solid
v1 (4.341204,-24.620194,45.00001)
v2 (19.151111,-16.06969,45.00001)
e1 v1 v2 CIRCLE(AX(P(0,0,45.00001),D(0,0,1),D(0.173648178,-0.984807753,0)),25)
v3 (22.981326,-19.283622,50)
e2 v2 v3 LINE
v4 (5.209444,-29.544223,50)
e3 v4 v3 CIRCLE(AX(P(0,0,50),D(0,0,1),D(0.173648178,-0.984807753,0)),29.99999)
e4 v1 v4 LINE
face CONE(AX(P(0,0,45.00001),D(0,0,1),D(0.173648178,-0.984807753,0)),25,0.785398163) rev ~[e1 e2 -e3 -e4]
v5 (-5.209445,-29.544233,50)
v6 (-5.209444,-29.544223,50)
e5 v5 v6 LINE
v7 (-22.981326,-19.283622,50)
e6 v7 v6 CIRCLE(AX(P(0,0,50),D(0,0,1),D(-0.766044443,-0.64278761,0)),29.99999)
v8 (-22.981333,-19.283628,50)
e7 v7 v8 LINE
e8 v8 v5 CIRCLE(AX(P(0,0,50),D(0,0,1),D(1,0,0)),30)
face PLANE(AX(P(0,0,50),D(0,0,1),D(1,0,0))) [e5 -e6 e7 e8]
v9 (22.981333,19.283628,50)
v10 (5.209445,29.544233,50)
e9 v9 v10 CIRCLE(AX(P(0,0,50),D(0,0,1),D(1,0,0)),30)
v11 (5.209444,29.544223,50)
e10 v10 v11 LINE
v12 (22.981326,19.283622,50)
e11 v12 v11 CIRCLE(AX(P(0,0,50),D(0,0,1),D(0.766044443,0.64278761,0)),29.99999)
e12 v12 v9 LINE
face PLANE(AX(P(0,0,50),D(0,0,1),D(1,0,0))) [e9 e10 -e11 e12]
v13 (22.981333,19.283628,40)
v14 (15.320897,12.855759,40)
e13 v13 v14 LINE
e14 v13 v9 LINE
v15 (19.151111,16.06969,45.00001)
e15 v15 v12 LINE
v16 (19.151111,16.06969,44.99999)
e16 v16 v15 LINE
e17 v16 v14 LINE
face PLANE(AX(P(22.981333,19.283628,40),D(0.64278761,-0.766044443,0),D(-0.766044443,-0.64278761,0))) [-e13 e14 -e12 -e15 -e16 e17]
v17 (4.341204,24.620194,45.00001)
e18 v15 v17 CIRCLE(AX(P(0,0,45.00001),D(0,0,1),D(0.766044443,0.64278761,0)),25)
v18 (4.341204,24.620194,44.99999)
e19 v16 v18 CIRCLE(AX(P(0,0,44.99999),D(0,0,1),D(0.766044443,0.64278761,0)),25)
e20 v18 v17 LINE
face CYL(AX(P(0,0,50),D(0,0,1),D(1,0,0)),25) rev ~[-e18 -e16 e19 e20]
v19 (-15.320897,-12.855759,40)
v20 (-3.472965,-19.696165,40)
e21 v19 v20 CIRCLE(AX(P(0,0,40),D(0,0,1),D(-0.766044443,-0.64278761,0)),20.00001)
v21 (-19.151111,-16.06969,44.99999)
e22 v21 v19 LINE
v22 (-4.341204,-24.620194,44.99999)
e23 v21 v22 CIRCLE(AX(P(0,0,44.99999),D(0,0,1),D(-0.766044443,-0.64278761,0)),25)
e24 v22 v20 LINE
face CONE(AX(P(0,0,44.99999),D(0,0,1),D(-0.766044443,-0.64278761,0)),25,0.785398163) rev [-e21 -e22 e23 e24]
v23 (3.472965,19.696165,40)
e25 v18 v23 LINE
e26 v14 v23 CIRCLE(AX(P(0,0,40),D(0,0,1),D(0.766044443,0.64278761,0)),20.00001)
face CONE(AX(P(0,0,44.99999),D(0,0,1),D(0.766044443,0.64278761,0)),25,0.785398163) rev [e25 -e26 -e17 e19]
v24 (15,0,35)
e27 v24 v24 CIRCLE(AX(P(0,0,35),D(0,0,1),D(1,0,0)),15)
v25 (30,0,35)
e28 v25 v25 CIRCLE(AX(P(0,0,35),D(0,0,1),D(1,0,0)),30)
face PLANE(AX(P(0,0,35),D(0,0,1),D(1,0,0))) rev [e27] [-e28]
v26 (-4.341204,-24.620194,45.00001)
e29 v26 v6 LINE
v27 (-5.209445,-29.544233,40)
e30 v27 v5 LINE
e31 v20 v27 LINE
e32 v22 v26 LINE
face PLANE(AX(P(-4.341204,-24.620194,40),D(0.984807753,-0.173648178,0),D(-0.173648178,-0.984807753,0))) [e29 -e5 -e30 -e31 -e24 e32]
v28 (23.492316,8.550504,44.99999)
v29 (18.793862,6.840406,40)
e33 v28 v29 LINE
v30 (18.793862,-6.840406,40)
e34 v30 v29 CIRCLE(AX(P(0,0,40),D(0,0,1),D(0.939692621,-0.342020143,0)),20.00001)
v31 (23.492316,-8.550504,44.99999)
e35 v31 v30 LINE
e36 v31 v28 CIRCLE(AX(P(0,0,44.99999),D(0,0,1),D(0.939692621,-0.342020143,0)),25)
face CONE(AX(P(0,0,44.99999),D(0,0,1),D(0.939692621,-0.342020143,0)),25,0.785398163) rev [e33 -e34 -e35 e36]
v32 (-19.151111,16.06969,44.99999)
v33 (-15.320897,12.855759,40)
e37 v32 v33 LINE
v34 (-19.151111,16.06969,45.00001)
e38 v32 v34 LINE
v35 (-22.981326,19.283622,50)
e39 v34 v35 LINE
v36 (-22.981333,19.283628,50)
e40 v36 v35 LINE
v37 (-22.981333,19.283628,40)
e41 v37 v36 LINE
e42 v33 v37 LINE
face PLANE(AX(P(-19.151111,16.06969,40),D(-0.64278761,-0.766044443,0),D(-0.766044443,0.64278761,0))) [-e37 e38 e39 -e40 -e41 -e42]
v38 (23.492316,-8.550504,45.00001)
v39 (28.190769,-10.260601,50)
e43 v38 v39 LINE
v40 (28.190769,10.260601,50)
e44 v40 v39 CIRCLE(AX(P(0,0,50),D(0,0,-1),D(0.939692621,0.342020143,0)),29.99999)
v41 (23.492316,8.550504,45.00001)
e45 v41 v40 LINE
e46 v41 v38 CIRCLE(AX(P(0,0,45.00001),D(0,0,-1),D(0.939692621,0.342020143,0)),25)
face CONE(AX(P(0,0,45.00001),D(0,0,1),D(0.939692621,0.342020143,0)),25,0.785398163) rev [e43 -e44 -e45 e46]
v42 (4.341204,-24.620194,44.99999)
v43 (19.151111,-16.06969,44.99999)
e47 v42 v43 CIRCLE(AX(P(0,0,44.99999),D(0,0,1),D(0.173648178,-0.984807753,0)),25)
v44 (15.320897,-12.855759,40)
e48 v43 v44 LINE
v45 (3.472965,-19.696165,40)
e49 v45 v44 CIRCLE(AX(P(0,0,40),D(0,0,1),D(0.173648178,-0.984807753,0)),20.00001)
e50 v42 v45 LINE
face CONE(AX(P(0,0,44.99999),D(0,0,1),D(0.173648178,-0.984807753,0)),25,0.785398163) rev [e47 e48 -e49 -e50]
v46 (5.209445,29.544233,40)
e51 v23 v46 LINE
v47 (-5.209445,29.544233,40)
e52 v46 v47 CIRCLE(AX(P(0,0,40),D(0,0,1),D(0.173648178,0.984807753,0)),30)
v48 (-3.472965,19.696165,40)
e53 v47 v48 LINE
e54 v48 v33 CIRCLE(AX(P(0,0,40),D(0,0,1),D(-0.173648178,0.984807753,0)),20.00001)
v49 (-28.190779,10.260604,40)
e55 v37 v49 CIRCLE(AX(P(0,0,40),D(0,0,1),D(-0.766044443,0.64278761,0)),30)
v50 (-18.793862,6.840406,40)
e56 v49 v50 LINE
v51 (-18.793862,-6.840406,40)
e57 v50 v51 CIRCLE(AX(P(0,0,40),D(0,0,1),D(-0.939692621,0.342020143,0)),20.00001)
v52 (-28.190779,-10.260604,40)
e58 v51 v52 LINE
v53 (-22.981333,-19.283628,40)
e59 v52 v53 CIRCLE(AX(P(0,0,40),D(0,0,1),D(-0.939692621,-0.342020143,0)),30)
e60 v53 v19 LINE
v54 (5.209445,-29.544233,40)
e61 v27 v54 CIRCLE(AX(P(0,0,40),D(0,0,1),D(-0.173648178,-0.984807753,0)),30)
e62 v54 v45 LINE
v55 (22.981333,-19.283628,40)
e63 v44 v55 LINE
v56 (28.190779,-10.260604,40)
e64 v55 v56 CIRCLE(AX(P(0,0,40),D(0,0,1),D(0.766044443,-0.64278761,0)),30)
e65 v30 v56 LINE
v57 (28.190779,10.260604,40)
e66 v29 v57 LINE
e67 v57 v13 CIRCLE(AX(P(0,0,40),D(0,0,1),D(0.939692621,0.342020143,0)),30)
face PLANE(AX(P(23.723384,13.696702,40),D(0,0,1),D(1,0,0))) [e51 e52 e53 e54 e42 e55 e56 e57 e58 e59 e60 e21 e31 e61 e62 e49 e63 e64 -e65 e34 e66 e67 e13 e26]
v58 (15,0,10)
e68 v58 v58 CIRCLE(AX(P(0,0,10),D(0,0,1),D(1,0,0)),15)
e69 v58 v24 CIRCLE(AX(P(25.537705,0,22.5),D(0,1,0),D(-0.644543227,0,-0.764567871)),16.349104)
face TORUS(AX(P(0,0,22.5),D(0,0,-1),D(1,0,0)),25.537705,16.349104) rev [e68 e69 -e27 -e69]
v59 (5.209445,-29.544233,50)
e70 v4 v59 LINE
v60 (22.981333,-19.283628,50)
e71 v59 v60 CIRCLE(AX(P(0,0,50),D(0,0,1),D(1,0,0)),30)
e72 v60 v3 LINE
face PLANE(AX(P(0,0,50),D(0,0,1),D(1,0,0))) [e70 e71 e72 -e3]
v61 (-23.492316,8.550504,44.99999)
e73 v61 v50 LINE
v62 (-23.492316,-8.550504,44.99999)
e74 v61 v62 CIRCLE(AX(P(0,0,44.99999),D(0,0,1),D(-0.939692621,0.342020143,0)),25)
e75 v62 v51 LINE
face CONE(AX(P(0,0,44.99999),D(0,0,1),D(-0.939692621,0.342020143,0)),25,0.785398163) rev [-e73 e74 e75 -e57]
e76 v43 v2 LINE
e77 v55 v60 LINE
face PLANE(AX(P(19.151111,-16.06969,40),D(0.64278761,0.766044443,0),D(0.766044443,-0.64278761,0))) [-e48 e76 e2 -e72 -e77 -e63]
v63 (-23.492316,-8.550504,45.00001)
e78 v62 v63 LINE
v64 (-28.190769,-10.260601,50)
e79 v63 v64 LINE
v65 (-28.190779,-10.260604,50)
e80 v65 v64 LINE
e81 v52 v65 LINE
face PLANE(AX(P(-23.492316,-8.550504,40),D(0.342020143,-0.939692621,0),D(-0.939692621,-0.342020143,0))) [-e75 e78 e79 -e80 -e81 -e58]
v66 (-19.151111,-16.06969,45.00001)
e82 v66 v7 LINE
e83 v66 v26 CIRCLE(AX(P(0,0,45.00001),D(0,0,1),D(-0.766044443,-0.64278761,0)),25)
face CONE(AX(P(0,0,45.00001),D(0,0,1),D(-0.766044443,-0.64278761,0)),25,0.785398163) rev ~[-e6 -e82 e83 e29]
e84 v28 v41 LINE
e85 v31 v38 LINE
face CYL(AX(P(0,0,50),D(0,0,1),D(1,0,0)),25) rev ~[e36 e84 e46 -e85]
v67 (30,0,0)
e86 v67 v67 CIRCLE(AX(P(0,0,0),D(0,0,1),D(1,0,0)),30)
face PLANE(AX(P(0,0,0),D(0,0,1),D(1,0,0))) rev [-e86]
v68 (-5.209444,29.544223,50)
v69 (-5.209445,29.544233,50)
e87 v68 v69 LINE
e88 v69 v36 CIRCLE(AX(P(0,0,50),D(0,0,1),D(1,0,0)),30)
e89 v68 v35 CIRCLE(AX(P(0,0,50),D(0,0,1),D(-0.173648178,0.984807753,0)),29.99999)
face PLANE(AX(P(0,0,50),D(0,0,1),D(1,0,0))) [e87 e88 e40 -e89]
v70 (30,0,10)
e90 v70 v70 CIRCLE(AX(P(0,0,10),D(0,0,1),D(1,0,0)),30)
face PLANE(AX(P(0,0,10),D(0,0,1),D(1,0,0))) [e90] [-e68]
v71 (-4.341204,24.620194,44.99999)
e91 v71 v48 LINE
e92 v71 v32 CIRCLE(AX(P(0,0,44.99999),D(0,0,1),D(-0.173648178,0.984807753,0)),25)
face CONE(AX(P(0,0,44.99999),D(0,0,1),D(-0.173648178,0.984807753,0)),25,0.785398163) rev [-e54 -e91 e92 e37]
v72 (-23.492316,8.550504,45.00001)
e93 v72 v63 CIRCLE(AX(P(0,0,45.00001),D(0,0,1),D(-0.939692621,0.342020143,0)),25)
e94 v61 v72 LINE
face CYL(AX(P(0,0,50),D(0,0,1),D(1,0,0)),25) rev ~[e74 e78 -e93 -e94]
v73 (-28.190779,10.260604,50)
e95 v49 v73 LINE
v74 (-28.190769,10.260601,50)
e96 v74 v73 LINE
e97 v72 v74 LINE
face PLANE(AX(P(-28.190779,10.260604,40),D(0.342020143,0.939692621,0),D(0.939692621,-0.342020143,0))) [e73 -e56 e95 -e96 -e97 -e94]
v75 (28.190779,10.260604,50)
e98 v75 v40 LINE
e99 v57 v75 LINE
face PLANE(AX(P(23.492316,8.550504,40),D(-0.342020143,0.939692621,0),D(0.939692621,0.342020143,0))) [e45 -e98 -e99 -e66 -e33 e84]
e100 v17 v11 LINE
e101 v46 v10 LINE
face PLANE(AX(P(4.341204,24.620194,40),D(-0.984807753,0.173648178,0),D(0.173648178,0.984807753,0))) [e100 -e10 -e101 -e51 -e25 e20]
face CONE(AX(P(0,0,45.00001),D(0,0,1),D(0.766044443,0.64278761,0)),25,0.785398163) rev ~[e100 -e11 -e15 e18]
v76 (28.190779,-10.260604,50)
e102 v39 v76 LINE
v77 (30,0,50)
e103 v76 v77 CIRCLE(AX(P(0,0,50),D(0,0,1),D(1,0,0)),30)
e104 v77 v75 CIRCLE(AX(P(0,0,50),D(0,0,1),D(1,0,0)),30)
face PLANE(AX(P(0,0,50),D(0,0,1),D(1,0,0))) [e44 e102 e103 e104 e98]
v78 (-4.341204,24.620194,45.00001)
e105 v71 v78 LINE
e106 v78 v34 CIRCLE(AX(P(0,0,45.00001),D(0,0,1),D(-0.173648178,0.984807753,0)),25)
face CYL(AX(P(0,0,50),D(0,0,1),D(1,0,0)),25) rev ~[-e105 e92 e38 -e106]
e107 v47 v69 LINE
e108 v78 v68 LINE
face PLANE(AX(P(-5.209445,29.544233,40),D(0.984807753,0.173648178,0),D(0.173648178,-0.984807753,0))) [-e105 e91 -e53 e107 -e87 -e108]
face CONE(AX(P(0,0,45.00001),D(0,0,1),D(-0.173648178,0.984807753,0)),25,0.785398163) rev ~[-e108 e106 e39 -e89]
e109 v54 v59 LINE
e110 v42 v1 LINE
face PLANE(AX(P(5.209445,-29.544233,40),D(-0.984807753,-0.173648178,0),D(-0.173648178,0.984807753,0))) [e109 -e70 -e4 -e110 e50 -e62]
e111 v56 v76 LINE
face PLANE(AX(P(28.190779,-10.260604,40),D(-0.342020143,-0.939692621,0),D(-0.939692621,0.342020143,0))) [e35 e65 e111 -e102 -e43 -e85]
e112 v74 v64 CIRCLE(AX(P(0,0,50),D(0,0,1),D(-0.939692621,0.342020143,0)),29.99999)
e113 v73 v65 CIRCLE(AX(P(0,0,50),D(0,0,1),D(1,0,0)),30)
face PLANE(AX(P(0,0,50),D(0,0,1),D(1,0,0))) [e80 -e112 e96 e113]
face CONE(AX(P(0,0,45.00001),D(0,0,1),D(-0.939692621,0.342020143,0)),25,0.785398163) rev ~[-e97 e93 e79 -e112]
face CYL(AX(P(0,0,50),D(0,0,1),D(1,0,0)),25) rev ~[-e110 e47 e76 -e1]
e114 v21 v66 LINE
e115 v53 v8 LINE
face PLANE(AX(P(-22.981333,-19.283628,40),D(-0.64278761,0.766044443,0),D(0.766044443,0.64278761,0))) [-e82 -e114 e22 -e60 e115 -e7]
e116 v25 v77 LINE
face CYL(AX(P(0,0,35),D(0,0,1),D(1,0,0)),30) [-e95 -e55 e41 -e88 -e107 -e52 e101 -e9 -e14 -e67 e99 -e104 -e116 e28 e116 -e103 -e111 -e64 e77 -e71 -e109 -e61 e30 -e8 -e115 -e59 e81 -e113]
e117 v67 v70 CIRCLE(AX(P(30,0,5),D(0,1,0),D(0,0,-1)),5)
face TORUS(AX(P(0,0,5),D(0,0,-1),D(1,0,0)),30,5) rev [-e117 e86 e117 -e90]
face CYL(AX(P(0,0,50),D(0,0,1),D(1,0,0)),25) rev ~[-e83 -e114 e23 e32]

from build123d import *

# Parameters (mm, degrees)
F2_R     = 25
F3_DEPTH = 10
F5_DEPTH = 42.2
F6_SIZE  = 4.99999


# Not quite as in the source:
# - a fillet or chamfer is up to 0.001 mm smaller than in the source, because OpenCascade refuses the exact size


with BuildPart() as f1:
    # F0 (on Front) → F1 (revolve)
    with BuildSketch(Plane.XZ):
        with BuildLine():
            Line((0, 10), (0, 0))
            Line((0, 0), (15, 0))
            Line((15, 0), (30, 0))
            ThreePointArc((30, 0), (25, 5), (30, 10))
            Line((30, 10), (15, 10))
            ThreePointArc((15, 10), (9.1886000762, 22.5), (15, 35))
            Line((15, 35), (30, 35))
            Line((30, 35), (30, 50))
            Line((30, 50), (0, 50))
            Line((0, 50), (0, 35))
            Line((0, 35), (0, 10))
        make_face()
    revolve(axis=Axis((0, 0, 42.5), (0, 0, 1)))

    # F2 (on face) → F3 (cut)
    with BuildSketch(Plane.XY.offset(50)):
        Circle(F2_R)
    extrude(amount=-F3_DEPTH, mode=Mode.SUBTRACT)

    # F4 (on face) → F5 (cut)
    with BuildSketch(Plane.XY.offset(40)):
        with BuildLine():
            ThreePointArc((-4.3412044417, 24.6201938253), (0, 25), (4.3412044417, 24.6201938253))
            Line((4.3412044417, 24.6201938253), (5.20944533, 29.5442325904))
            ThreePointArc((5.20944533, 29.5442325904), (0, 30), (-5.20944533, 29.5442325904))
            Line((-5.20944533, 29.5442325904), (-4.3412044417, 24.6201938253))
        make_face()
        with BuildLine():
            Line((-19.151111078, 16.0696902422), (-22.9813332936, 19.2836282906))
            ThreePointArc((-22.9813332936, 19.2836282906), (-25.9807621135, 15), (-28.1907786236, 10.2606042998))
            Line((-28.1907786236, 10.2606042998), (-23.4923155196, 8.5505035831))
            ThreePointArc((-23.4923155196, 8.5505035831), (-21.6506350946, 12.5), (-19.151111078, 16.0696902422))
        make_face()
        with BuildLine():
            Line((-23.4923155196, -8.5505035831), (-28.1907786236, -10.2606042998))
            ThreePointArc((-28.1907786236, -10.2606042998), (-25.9807621135, -15), (-22.9813332936, -19.2836282906))
            Line((-22.9813332936, -19.2836282906), (-19.151111078, -16.0696902422))
            ThreePointArc((-19.151111078, -16.0696902422), (-21.6506350946, -12.5), (-23.4923155196, -8.5505035831))
        make_face()
        with BuildLine():
            Line((-4.3412044417, -24.6201938253), (-5.20944533, -29.5442325904))
            ThreePointArc((-5.20944533, -29.5442325904), (0, -30), (5.20944533, -29.5442325904))
            Line((5.20944533, -29.5442325904), (4.3412044417, -24.6201938253))
            ThreePointArc((4.3412044417, -24.6201938253), (0, -25), (-4.3412044417, -24.6201938253))
        make_face()
        with BuildLine():
            Line((19.151111078, -16.0696902422), (22.9813332936, -19.2836282906))
            ThreePointArc((22.9813332936, -19.2836282906), (25.9807621135, -15), (28.1907786236, -10.2606042998))
            Line((28.1907786236, -10.2606042998), (23.4923155196, -8.5505035831))
            ThreePointArc((23.4923155196, -8.5505035831), (21.6506350946, -12.5), (19.151111078, -16.0696902422))
        make_face()
        with BuildLine():
            Line((23.4923155196, 8.5505035831), (28.1907786236, 10.2606042998))
            ThreePointArc((28.1907786236, 10.2606042998), (25.9807621135, 15), (22.9813332936, 19.2836282906))
            Line((22.9813332936, 19.2836282906), (19.151111078, 16.0696902422))
            ThreePointArc((19.151111078, 16.0696902422), (21.6506350946, 12.5), (23.4923155196, 8.5505035831))
        make_face()
    extrude(amount=F5_DEPTH, mode=Mode.SUBTRACT)

    # F6 (size 5 in the source; OpenCascade refuses exactly that, so slightly less here)
    f6_edges = [f1.edges().sort_by_distance(p)[0] for p in [
        (25, 0, 40),
        (-12.5, -21.650635, 40),
        (-25, 0, 40),
        (-12.5, 21.650635, 40),
        (12.5, 21.650635, 40),
        (-12.5, 21.650635, 50),
        (12.5, 21.650635, 50),
        (25, 0, 50),
        (12.5, -21.650635, 40),
        (12.5, -21.650635, 50),
        (-12.5, -21.650635, 50),
        (-25, 0, 50),
    ]]
    chamfer(f6_edges, length=F6_SIZE)


solid = f1.part
